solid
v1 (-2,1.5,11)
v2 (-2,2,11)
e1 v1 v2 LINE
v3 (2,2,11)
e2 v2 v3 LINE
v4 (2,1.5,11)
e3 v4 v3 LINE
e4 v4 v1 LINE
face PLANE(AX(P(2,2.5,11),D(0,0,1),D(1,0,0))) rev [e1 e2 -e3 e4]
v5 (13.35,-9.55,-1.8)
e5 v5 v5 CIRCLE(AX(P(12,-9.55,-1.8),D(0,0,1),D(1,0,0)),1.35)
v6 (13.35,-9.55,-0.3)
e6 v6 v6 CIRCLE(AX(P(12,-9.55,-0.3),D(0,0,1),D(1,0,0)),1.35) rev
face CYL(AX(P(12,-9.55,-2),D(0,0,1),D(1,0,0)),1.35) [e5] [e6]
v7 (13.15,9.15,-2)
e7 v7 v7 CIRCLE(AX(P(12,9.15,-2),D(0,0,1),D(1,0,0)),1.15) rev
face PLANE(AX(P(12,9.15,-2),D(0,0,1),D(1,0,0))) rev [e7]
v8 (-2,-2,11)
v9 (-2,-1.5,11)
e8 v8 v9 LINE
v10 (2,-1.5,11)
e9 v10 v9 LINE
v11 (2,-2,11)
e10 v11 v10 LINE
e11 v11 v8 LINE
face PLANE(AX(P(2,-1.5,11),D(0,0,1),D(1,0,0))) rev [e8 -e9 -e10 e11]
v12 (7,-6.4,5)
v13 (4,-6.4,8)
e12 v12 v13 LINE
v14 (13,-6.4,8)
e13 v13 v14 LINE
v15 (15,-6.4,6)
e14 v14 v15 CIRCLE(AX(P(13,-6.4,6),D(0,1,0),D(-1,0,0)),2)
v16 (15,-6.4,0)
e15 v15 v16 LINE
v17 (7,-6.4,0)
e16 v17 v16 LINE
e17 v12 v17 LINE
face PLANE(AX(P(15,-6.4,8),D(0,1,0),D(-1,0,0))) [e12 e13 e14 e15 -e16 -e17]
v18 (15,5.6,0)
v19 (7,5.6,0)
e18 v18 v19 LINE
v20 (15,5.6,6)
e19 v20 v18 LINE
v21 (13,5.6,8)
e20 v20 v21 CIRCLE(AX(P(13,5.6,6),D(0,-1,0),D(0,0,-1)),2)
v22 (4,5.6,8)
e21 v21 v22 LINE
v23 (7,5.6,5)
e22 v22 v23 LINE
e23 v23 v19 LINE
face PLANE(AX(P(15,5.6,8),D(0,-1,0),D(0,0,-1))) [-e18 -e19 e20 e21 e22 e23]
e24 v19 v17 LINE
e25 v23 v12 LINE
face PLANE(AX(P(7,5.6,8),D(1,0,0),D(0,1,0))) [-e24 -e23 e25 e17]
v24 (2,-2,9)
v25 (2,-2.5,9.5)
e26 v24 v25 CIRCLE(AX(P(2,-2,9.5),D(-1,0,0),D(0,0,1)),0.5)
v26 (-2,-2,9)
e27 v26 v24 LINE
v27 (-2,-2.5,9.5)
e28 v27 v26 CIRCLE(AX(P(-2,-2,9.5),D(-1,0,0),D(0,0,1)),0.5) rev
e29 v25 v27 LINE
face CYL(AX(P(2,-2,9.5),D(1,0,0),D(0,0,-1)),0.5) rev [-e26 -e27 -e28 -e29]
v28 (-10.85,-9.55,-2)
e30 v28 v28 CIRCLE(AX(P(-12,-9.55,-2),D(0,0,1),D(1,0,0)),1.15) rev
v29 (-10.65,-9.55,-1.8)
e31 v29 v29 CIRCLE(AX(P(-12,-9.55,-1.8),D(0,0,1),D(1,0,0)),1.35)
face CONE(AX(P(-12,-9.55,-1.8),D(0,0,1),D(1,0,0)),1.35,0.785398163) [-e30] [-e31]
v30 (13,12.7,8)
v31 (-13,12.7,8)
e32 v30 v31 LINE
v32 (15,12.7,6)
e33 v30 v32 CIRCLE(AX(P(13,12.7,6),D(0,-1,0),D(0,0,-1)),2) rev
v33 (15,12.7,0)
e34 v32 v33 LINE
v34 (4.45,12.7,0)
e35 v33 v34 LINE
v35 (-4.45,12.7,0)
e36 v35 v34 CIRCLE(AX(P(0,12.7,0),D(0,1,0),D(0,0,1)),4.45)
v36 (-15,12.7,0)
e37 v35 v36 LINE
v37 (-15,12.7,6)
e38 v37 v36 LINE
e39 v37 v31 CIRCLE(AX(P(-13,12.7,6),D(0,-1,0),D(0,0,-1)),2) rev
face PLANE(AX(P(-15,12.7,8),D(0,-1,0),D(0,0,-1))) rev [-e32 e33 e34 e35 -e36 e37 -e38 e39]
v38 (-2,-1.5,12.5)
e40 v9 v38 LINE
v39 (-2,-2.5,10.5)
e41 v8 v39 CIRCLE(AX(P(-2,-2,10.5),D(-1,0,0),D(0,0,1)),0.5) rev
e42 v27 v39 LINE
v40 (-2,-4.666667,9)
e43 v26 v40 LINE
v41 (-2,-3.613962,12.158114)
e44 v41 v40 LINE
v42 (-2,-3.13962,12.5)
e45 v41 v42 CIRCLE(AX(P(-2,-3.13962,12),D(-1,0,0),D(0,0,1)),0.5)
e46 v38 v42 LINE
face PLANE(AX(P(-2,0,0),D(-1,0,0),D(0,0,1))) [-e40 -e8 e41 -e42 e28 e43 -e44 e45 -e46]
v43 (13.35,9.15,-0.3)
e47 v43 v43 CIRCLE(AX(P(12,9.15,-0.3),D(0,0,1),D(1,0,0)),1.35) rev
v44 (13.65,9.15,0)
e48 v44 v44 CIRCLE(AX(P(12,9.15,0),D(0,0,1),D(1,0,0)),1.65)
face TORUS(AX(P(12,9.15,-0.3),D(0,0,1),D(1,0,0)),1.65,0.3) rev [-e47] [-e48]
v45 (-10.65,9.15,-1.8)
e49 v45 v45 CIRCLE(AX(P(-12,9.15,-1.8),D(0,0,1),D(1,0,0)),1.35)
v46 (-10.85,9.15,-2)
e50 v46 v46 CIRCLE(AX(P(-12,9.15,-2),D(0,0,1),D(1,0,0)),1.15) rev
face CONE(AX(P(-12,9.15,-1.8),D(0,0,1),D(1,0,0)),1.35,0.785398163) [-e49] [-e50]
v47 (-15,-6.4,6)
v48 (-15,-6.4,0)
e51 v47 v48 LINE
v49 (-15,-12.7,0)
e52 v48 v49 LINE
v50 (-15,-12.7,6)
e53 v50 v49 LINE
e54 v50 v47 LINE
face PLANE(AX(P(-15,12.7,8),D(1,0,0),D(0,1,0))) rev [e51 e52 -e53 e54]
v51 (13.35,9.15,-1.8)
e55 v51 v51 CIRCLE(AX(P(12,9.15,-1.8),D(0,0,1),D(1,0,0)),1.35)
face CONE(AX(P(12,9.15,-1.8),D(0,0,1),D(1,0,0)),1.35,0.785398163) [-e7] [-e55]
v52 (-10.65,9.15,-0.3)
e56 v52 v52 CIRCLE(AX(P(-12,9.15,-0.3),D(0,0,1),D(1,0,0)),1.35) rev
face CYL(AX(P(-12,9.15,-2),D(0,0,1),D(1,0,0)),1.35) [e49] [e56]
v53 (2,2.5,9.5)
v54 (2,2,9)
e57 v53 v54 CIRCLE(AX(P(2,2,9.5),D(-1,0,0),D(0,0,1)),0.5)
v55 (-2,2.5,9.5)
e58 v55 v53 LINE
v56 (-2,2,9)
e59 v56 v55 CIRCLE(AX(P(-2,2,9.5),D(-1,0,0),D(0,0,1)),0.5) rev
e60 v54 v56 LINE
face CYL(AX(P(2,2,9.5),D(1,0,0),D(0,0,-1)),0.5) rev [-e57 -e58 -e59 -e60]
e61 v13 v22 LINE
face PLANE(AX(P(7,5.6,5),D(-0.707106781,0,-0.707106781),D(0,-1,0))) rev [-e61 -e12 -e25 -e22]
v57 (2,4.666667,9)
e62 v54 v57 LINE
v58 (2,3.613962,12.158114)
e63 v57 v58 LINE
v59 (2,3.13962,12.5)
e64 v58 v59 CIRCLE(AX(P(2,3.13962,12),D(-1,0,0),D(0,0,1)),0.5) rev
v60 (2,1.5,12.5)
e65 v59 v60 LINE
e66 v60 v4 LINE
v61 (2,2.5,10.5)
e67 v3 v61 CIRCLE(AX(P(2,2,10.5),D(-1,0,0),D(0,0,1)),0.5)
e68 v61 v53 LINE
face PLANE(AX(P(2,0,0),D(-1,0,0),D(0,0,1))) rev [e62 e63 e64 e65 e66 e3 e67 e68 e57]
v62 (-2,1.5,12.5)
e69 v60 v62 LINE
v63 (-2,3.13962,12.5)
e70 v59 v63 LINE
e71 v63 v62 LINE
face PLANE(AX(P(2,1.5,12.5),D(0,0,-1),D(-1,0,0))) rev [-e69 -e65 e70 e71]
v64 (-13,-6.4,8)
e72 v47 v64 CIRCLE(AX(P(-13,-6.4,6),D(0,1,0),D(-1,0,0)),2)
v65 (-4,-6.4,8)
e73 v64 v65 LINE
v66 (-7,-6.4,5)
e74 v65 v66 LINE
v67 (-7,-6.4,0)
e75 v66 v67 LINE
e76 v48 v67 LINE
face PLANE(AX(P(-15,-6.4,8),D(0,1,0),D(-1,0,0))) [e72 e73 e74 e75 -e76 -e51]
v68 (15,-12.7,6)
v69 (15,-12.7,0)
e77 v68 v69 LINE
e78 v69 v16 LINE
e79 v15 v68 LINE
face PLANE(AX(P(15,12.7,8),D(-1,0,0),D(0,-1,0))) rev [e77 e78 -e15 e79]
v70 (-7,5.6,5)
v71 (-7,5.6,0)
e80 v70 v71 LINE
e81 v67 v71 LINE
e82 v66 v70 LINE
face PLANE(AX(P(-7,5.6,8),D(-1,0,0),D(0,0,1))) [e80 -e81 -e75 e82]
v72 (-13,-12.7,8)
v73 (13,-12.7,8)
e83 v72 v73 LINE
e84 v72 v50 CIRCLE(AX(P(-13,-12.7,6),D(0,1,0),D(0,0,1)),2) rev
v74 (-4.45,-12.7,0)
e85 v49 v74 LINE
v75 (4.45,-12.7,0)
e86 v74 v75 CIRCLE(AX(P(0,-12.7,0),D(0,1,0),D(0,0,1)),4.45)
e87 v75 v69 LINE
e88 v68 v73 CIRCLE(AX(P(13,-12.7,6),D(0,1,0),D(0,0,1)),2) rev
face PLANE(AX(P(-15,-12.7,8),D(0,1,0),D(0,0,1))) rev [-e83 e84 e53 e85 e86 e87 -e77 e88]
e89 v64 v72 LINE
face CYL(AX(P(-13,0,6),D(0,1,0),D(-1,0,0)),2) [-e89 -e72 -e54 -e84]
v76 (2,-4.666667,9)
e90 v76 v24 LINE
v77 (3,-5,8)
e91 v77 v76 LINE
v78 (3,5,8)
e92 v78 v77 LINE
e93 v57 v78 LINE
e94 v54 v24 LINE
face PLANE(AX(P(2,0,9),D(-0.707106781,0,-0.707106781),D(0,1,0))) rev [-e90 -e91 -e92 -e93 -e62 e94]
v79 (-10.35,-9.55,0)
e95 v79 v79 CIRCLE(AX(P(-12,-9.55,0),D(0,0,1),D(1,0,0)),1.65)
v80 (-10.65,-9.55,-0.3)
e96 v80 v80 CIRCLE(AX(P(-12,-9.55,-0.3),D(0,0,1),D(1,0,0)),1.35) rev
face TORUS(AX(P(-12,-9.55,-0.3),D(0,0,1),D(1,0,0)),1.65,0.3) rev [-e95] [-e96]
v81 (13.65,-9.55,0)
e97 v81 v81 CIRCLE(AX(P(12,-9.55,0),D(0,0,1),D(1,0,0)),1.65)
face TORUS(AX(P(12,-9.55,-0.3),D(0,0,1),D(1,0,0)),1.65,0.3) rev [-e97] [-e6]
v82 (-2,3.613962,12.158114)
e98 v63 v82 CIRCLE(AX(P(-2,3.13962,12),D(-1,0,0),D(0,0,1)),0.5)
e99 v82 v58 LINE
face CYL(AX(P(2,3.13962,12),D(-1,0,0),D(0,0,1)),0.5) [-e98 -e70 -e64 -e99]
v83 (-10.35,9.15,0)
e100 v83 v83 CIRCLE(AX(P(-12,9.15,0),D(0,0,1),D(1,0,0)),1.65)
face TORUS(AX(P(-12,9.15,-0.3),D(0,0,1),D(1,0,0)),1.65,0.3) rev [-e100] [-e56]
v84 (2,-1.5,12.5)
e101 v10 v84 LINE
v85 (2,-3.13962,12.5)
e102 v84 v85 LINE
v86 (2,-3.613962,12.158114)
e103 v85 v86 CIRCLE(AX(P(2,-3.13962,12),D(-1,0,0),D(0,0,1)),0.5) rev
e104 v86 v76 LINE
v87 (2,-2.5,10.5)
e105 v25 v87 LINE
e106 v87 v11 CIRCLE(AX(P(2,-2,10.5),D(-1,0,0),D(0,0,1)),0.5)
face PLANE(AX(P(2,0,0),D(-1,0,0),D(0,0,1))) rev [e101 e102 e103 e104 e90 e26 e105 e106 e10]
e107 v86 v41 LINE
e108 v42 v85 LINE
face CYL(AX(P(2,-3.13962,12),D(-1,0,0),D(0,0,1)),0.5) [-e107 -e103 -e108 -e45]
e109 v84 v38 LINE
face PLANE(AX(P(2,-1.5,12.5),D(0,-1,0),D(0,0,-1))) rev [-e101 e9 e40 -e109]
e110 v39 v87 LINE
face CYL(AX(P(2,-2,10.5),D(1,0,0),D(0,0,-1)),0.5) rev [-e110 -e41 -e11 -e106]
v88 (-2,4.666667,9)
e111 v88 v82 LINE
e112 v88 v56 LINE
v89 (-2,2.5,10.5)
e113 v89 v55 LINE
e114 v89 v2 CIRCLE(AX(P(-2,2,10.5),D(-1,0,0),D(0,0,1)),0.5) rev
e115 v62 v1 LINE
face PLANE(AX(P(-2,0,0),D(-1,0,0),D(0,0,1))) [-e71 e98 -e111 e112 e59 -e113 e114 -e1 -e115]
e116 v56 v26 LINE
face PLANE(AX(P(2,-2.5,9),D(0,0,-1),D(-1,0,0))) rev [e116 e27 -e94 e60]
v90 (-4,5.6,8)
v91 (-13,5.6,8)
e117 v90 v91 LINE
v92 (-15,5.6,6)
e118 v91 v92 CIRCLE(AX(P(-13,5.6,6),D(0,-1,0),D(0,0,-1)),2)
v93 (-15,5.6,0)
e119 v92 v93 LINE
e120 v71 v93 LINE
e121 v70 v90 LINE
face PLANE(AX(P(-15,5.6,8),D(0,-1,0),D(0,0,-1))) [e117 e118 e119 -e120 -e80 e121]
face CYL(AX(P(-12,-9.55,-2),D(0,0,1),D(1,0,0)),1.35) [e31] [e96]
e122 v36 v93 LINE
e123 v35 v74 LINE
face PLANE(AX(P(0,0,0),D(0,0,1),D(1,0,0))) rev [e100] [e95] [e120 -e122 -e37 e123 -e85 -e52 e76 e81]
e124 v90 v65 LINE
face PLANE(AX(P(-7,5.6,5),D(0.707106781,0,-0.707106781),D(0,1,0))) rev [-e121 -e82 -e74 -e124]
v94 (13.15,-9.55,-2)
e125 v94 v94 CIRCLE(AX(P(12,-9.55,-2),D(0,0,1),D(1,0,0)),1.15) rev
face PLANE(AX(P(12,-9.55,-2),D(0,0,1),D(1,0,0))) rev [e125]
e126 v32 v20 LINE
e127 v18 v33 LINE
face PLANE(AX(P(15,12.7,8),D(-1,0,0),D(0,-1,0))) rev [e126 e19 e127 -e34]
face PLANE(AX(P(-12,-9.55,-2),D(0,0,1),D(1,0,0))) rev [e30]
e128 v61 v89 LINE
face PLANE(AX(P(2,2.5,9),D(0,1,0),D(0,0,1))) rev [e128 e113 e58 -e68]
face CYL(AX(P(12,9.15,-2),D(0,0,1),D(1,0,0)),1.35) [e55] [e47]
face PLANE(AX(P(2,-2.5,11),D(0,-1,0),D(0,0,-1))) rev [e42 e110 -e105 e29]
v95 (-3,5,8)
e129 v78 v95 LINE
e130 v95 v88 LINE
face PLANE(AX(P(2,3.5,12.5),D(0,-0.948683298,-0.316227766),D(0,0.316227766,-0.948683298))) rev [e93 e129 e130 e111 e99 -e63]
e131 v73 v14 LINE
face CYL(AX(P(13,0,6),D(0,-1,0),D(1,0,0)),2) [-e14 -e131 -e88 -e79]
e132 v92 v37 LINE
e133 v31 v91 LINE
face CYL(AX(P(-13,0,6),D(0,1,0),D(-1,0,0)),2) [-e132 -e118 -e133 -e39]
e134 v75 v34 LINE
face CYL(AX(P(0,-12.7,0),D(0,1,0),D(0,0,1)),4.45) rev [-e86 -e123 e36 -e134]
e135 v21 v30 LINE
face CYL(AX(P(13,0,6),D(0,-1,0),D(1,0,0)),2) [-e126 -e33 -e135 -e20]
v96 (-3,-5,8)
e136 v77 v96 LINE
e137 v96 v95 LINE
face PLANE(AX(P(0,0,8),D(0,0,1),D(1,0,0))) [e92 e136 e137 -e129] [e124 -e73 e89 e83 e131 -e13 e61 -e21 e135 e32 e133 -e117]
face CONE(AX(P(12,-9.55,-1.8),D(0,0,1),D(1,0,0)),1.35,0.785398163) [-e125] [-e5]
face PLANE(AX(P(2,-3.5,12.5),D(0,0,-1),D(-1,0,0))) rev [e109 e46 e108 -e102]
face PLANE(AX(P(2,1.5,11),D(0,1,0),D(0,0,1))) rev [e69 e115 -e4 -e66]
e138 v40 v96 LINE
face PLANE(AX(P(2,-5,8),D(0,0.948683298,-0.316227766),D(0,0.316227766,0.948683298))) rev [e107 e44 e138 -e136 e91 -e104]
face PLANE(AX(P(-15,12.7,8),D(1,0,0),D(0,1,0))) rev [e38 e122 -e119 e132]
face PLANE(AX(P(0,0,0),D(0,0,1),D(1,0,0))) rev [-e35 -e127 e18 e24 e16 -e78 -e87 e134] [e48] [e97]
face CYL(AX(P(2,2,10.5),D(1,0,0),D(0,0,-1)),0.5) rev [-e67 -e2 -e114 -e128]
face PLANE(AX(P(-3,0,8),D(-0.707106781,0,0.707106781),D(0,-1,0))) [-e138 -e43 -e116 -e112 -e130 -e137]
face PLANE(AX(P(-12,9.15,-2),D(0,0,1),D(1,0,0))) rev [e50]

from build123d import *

# Parameters (mm, degrees)
SKETCH1_W               = 30
SKETCH1_H               = 25.4
BOSS_EXTRUDE1_DEPTH     = 8
CUT_EXTRUDE1_DEPTH      = 22.2200377
CUT_EXTRUDE1_DEPTH_BACK = 22.2200377
SKETCH2_R               = 4.45
SKETCH3_R               = 1.35
BOSS_EXTRUDE2_DEPTH     = 2
FILLET1_R               = 0.3
CHAMFER1_SIZE           = 0.2
SKETCH4_W               = 8
SKETCH4_H               = 12
CUT_EXTRUDE2_DEPTH      = 22.2200377
BOSS_EXTRUDE3_DEPTH     = 2
CHAMFER2_SIZE           = 1
FILLET2_R               = 0.5
CHAMFER3_SIZE           = 3
FILLET3_R               = 2


with BuildPart() as part:
    # Sketch1 → Boss-Extrude1 (new body)
    with BuildSketch(Plane.XY):
        Rectangle(SKETCH1_W, SKETCH1_H)
    extrude(amount=BOSS_EXTRUDE1_DEPTH)

    # Sketch2 → Cut-Extrude1 (cut, two sides: drawn at the far end of the back side and taken through both)
    with BuildSketch(Plane(origin=(0, 0, 0), x_dir=(1, 0, 0), z_dir=(0, 1, 0)).offset(-CUT_EXTRUDE1_DEPTH_BACK)):
        Circle(SKETCH2_R)
    extrude(amount=CUT_EXTRUDE1_DEPTH + CUT_EXTRUDE1_DEPTH_BACK, mode=Mode.SUBTRACT)

    # Sketch3 → Boss-Extrude2 (add)
    with BuildSketch(Plane.XY):
        with Locations((-12, 9.15)):
            Circle(SKETCH3_R)
        with Locations((12, 9.15)):
            Circle(SKETCH3_R)
        with Locations((12, -9.55)):
            Circle(SKETCH3_R)
        with Locations((-12, -9.55)):
            Circle(SKETCH3_R)
    extrude(amount=-BOSS_EXTRUDE2_DEPTH)

    # Fillet1
    fillet1_edges = [part.edges().sort_by_distance(p)[0] for p in [
        (-13.35, 9.15, 0),
        (10.65, 9.15, 0),
        (10.65, -9.55, 0),
        (-13.35, -9.55, 0),
    ]]
    fillet(fillet1_edges, radius=FILLET1_R)

    # Chamfer1
    chamfer1_edges = [part.edges().sort_by_distance(p)[0] for p in [
        (-13.35, 9.15, -2),
        (10.65, 9.15, -2),
        (10.65, -9.55, -2),
        (-13.35, -9.55, -2),
    ]]
    chamfer(chamfer1_edges, length=CHAMFER1_SIZE)

    # Sketch4 → Cut-Extrude2 (cut, through all)
    with BuildSketch(Plane.XY):
        with Locations((-11, -0.4)):
            Rectangle(SKETCH4_W, SKETCH4_H)
        with Locations((11, -0.4)):
            Rectangle(SKETCH4_W, SKETCH4_H)
    extrude(amount=CUT_EXTRUDE2_DEPTH, mode=Mode.SUBTRACT)

    # Sketch5 → Boss-Extrude3 (add, symmetric)
    with BuildSketch(Plane(origin=(0, 0, 0), x_dir=(0, 0, -1), z_dir=(1, 0, 0))):
        Polygon((-8, 5), (-8, -5), (-12.5, -3.5), (-12.5, -1.5), (-11, -1.5), (-11, -2.5), (-9, -2.5), (-9, 2.5), (-11, 2.5), (-11, 1.5), (-12.5, 1.5), (-12.5, 3.5), align=None)
    extrude(amount=BOSS_EXTRUDE3_DEPTH, both=True)

    # Chamfer2
    chamfer2_edges = [part.edges().sort_by_distance(p)[0] for p in [
        (2, 0, 8),
        (-2, 0, 8),
    ]]
    chamfer(chamfer2_edges, length=CHAMFER2_SIZE - 0.0001)  # a hair under: the kernel refuses the full size

    # Fillet2
    fillet2_edges = [part.edges().sort_by_distance(p)[0] for p in [
        (0, 3.5, 12.5),
        (0, 2.5, 11),
        (0, 2.5, 9),
        (0, -2.5, 9),
        (0, -2.5, 11),
        (0, -3.5, 12.5),
    ]]
    fillet(fillet2_edges, radius=FILLET2_R)

    # Chamfer3
    chamfer3_edges = [part.edges().sort_by_distance(p)[0] for p in [
        (-7, -0.4, 8),
        (7, -0.4, 8),
    ]]
    chamfer(chamfer3_edges, length=CHAMFER3_SIZE)

    # Fillet3
    fillet3_edges = [part.edges().sort_by_distance(p)[0] for p in [
        (-15, 9.15, 8),
        (15, -9.55, 8),
        (15, 9.15, 8),
        (-15, -9.55, 8),
    ]]
    fillet(fillet3_edges, radius=FILLET3_R)


solid = part.part
